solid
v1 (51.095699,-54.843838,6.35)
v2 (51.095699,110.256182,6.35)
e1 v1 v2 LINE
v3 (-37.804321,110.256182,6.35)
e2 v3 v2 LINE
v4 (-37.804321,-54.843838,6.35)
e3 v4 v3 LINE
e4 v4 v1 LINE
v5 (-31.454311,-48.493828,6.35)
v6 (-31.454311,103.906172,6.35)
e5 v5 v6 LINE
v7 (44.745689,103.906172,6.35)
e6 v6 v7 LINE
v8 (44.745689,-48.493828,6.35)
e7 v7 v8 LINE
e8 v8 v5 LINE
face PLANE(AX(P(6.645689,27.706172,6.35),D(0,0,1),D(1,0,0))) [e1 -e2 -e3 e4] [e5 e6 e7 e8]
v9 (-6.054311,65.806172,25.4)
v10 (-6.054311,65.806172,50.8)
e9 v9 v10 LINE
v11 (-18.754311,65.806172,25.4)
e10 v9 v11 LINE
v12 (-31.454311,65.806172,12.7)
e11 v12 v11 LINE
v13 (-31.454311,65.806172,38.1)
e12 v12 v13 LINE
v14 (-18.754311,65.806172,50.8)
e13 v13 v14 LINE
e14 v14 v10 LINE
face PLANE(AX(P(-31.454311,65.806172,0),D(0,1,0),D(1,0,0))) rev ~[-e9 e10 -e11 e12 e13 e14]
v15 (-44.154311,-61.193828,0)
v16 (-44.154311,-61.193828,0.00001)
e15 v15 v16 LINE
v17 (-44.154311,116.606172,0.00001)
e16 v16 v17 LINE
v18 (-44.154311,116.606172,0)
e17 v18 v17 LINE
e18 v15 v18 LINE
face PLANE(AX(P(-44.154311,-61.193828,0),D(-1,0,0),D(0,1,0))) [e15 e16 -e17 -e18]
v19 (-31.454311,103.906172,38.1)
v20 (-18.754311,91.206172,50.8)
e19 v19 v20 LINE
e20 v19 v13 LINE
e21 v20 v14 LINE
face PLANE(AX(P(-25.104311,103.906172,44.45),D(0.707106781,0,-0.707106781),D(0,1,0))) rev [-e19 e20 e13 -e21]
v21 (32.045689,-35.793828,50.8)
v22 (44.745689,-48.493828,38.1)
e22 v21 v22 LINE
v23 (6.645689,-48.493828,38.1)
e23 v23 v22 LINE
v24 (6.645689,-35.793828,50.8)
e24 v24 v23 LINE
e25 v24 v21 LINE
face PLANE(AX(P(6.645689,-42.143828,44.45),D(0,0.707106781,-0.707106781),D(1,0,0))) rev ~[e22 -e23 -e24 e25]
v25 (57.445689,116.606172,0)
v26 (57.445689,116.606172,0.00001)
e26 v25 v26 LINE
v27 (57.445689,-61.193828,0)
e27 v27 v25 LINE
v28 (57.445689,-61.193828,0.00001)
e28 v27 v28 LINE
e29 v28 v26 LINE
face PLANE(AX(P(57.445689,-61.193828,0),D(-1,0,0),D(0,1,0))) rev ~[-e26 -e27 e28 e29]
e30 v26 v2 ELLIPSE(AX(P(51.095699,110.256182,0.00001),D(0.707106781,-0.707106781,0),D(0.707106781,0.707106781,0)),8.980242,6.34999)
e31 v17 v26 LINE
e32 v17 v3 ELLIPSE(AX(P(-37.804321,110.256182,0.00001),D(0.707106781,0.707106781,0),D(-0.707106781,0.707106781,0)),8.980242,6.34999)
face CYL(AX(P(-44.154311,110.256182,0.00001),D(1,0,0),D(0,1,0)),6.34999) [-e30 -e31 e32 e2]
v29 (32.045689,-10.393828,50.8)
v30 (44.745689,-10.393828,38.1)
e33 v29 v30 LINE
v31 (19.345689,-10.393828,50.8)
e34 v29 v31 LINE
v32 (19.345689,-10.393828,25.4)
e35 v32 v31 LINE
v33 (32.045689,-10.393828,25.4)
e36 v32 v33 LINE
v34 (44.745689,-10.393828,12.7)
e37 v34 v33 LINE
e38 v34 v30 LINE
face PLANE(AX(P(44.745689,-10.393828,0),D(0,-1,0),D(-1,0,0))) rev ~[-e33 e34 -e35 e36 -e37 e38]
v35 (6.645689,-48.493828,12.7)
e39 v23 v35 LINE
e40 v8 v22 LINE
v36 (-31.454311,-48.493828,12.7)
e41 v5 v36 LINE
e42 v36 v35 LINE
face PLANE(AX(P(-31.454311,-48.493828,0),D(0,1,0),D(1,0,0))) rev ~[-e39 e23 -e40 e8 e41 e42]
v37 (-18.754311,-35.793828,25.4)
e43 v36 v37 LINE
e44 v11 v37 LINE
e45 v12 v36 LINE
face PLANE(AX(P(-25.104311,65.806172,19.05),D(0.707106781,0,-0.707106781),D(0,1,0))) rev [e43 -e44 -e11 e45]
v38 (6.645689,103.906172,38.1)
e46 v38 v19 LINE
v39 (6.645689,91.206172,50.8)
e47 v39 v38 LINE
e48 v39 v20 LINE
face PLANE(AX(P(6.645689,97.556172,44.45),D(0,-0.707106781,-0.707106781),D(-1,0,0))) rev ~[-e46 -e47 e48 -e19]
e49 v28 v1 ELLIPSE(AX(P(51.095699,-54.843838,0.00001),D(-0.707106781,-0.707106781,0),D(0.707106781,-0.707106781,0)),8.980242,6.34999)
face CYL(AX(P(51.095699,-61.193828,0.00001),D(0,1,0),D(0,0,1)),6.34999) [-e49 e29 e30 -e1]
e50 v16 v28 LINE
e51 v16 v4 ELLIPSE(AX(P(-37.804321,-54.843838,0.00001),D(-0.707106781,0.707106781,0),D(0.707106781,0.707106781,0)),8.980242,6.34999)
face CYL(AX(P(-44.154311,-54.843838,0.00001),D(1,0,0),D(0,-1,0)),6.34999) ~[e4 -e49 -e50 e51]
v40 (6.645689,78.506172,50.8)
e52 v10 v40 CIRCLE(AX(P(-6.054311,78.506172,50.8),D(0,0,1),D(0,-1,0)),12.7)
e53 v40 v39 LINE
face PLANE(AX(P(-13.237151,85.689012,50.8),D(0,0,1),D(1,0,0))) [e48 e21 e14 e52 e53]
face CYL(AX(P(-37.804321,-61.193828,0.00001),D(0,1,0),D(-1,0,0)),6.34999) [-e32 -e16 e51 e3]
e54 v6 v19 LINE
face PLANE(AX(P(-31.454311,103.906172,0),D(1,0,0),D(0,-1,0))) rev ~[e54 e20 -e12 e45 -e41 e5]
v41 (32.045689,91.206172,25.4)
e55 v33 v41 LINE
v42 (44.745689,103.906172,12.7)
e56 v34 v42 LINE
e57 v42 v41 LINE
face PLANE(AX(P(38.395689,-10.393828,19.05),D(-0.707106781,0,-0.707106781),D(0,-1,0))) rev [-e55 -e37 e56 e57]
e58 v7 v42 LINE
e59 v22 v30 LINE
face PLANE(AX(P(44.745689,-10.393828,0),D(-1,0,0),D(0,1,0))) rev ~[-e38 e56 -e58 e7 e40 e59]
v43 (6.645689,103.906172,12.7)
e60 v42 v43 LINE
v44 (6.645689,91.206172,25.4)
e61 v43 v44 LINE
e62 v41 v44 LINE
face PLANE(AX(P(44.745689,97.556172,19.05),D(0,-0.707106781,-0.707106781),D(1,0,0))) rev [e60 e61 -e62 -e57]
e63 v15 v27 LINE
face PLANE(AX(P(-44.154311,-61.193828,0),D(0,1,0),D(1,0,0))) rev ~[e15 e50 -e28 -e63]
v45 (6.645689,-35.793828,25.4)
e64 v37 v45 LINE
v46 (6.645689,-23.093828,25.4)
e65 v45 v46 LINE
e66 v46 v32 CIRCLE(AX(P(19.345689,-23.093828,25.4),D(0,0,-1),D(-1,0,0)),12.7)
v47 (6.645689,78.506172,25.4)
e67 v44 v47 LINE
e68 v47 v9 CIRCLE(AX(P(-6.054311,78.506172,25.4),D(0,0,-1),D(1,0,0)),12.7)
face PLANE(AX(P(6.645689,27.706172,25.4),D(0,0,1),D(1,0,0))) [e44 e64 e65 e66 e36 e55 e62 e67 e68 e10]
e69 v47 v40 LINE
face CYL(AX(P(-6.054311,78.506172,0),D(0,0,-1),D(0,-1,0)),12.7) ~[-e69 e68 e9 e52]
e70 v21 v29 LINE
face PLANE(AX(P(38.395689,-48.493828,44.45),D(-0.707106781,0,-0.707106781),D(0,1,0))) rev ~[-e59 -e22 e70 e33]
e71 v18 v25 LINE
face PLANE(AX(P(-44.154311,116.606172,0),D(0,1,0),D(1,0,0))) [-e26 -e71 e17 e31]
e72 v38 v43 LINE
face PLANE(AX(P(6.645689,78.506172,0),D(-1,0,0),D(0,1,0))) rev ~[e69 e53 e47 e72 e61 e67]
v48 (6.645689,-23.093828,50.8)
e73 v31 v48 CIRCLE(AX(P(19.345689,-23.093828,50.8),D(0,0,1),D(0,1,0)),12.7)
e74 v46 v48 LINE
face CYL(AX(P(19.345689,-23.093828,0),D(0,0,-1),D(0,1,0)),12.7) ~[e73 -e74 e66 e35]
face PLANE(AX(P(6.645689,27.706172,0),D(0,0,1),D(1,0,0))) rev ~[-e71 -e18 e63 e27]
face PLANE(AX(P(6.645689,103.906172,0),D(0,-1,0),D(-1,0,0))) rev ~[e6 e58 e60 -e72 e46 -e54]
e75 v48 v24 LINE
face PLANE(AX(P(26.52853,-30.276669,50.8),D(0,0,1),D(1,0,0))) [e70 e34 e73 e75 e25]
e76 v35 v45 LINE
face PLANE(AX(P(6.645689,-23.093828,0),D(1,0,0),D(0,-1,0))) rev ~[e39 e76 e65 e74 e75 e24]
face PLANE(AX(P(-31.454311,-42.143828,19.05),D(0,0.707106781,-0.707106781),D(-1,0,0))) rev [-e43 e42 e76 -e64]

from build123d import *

# Parameters (mm, degrees)
F1_DEPTH = 25.4
F2_DEPTH = 50.8
F0_W     = 101.6
F0_H     = 177.8
F3_DEPTH = 6.35
F4_R     = 6.34999
F5_SIZE  = 12.7
F6_SIZE  = 12.7


# Not quite as in the source:
# - a fillet or chamfer is up to 0.001 mm smaller than in the source, because OpenCascade refuses the exact size
# - a length typed as a fraction of an inch, garbled in the dataset ("3 / 203.2 mm" for 3/8 in), is restored


with BuildPart() as f1:
    # F0 (on Top) → F1 (new body)
    with BuildSketch(Plane.XY):
        with BuildLine():
            Line((44.7456893295, 103.9061718148), (6.6456893295, 103.9061718148))
            Line((6.6456893295, 103.9061718148), (6.6456893295, 78.5061718148))
            ThreePointArc((6.6456893295, 78.5061718148), (2.9259454506, 69.5259156938), (-6.0543106705, 65.8061718148))
            Line((-6.0543106705, 65.8061718148), (-31.4543106705, 65.8061718148))
            Line((-31.4543106705, 65.8061718148), (-31.4543106705, -48.4938281852))
            Line((-31.4543106705, -48.4938281852), (6.6456893295, -48.4938281852))
            Line((6.6456893295, -48.4938281852), (6.6456893295, -23.0938281852))
            ThreePointArc((6.6456893295, -23.0938281852), (10.3654332084, -14.1135720641), (19.3456893295, -10.3938281852))
            Line((19.3456893295, -10.3938281852), (44.7456893295, -10.3938281852))
            Line((44.7456893295, -10.3938281852), (44.7456893295, 103.9061718148))
        make_face()
    extrude(amount=F1_DEPTH)

    # F0 (on Top) → F2 (join)
    with BuildSketch(Plane.XY):
        with BuildLine():
            Line((6.6456893295, 103.9061718148), (-31.4543106705, 103.9061718148))
            Line((-31.4543106705, 103.9061718148), (-31.4543106705, 65.8061718148))
            Line((-31.4543106705, 65.8061718148), (-6.0543106705, 65.8061718148))
            ThreePointArc((-6.0543106705, 65.8061718148), (2.9259454506, 69.5259156938), (6.6456893295, 78.5061718148))
            Line((6.6456893295, 78.5061718148), (6.6456893295, 103.9061718148))
        make_face()
        with BuildLine():
            Line((44.7456893295, -48.4938281852), (44.7456893295, -10.3938281852))
            Line((44.7456893295, -10.3938281852), (19.3456893295, -10.3938281852))
            ThreePointArc((19.3456893295, -10.3938281852), (10.3654332084, -14.1135720641), (6.6456893295, -23.0938281852))
            Line((6.6456893295, -23.0938281852), (6.6456893295, -48.4938281852))
            Line((6.6456893295, -48.4938281852), (44.7456893295, -48.4938281852))
        make_face()
    extrude(amount=F2_DEPTH)

    # F0 (on Top) → F3 (join)
    with BuildSketch(Plane.XY):
        with Locations((6.6456893295, 27.7061718148)):
            Rectangle(F0_W, F0_H)
        Polygon((-31.4543106705, 65.8061718148), (-31.4543106705, 103.9061718148), (6.6456893295, 103.9061718148), (44.7456893295, 103.9061718148), (44.7456893295, -10.3938281852), (44.7456893295, -48.4938281852), (6.6456893295, -48.4938281852), (-31.4543106705, -48.4938281852), align=None, mode=Mode.SUBTRACT)
    extrude(amount=F3_DEPTH)

    # F4 (radius 6.35 in the source; OpenCascade refuses exactly that, so slightly less here)
    f4_edges = [f1.edges().sort_by_distance(p)[0] for p in [
        (6.645689, -61.193828, 6.35),
        (-44.154311, 27.706172, 6.35),
        (6.645689, 116.606172, 6.35),
        (57.445689, 27.706172, 6.35),
    ]]
    fillet(f4_edges, radius=F4_R)

    # F5
    f5_edges = [f1.edges().sort_by_distance(p)[0] for p in [
        (-12.404311, -48.493828, 25.4),
        (-31.454311, 8.656172, 25.4),
        (44.745689, 46.756172, 25.4),
        (25.695689, 103.906172, 25.4),
    ]]
    chamfer(f5_edges, length=F5_SIZE)

    # F6
    f6_edges = [f1.edges().sort_by_distance(p)[0] for p in [
        (44.745689, -29.443828, 50.8),
        (25.695689, -48.493828, 50.8),
        (-31.454311, 84.856172, 50.8),
        (-12.404311, 103.906172, 50.8),
    ]]
    chamfer(f6_edges, length=F6_SIZE)


solid = f1.part
